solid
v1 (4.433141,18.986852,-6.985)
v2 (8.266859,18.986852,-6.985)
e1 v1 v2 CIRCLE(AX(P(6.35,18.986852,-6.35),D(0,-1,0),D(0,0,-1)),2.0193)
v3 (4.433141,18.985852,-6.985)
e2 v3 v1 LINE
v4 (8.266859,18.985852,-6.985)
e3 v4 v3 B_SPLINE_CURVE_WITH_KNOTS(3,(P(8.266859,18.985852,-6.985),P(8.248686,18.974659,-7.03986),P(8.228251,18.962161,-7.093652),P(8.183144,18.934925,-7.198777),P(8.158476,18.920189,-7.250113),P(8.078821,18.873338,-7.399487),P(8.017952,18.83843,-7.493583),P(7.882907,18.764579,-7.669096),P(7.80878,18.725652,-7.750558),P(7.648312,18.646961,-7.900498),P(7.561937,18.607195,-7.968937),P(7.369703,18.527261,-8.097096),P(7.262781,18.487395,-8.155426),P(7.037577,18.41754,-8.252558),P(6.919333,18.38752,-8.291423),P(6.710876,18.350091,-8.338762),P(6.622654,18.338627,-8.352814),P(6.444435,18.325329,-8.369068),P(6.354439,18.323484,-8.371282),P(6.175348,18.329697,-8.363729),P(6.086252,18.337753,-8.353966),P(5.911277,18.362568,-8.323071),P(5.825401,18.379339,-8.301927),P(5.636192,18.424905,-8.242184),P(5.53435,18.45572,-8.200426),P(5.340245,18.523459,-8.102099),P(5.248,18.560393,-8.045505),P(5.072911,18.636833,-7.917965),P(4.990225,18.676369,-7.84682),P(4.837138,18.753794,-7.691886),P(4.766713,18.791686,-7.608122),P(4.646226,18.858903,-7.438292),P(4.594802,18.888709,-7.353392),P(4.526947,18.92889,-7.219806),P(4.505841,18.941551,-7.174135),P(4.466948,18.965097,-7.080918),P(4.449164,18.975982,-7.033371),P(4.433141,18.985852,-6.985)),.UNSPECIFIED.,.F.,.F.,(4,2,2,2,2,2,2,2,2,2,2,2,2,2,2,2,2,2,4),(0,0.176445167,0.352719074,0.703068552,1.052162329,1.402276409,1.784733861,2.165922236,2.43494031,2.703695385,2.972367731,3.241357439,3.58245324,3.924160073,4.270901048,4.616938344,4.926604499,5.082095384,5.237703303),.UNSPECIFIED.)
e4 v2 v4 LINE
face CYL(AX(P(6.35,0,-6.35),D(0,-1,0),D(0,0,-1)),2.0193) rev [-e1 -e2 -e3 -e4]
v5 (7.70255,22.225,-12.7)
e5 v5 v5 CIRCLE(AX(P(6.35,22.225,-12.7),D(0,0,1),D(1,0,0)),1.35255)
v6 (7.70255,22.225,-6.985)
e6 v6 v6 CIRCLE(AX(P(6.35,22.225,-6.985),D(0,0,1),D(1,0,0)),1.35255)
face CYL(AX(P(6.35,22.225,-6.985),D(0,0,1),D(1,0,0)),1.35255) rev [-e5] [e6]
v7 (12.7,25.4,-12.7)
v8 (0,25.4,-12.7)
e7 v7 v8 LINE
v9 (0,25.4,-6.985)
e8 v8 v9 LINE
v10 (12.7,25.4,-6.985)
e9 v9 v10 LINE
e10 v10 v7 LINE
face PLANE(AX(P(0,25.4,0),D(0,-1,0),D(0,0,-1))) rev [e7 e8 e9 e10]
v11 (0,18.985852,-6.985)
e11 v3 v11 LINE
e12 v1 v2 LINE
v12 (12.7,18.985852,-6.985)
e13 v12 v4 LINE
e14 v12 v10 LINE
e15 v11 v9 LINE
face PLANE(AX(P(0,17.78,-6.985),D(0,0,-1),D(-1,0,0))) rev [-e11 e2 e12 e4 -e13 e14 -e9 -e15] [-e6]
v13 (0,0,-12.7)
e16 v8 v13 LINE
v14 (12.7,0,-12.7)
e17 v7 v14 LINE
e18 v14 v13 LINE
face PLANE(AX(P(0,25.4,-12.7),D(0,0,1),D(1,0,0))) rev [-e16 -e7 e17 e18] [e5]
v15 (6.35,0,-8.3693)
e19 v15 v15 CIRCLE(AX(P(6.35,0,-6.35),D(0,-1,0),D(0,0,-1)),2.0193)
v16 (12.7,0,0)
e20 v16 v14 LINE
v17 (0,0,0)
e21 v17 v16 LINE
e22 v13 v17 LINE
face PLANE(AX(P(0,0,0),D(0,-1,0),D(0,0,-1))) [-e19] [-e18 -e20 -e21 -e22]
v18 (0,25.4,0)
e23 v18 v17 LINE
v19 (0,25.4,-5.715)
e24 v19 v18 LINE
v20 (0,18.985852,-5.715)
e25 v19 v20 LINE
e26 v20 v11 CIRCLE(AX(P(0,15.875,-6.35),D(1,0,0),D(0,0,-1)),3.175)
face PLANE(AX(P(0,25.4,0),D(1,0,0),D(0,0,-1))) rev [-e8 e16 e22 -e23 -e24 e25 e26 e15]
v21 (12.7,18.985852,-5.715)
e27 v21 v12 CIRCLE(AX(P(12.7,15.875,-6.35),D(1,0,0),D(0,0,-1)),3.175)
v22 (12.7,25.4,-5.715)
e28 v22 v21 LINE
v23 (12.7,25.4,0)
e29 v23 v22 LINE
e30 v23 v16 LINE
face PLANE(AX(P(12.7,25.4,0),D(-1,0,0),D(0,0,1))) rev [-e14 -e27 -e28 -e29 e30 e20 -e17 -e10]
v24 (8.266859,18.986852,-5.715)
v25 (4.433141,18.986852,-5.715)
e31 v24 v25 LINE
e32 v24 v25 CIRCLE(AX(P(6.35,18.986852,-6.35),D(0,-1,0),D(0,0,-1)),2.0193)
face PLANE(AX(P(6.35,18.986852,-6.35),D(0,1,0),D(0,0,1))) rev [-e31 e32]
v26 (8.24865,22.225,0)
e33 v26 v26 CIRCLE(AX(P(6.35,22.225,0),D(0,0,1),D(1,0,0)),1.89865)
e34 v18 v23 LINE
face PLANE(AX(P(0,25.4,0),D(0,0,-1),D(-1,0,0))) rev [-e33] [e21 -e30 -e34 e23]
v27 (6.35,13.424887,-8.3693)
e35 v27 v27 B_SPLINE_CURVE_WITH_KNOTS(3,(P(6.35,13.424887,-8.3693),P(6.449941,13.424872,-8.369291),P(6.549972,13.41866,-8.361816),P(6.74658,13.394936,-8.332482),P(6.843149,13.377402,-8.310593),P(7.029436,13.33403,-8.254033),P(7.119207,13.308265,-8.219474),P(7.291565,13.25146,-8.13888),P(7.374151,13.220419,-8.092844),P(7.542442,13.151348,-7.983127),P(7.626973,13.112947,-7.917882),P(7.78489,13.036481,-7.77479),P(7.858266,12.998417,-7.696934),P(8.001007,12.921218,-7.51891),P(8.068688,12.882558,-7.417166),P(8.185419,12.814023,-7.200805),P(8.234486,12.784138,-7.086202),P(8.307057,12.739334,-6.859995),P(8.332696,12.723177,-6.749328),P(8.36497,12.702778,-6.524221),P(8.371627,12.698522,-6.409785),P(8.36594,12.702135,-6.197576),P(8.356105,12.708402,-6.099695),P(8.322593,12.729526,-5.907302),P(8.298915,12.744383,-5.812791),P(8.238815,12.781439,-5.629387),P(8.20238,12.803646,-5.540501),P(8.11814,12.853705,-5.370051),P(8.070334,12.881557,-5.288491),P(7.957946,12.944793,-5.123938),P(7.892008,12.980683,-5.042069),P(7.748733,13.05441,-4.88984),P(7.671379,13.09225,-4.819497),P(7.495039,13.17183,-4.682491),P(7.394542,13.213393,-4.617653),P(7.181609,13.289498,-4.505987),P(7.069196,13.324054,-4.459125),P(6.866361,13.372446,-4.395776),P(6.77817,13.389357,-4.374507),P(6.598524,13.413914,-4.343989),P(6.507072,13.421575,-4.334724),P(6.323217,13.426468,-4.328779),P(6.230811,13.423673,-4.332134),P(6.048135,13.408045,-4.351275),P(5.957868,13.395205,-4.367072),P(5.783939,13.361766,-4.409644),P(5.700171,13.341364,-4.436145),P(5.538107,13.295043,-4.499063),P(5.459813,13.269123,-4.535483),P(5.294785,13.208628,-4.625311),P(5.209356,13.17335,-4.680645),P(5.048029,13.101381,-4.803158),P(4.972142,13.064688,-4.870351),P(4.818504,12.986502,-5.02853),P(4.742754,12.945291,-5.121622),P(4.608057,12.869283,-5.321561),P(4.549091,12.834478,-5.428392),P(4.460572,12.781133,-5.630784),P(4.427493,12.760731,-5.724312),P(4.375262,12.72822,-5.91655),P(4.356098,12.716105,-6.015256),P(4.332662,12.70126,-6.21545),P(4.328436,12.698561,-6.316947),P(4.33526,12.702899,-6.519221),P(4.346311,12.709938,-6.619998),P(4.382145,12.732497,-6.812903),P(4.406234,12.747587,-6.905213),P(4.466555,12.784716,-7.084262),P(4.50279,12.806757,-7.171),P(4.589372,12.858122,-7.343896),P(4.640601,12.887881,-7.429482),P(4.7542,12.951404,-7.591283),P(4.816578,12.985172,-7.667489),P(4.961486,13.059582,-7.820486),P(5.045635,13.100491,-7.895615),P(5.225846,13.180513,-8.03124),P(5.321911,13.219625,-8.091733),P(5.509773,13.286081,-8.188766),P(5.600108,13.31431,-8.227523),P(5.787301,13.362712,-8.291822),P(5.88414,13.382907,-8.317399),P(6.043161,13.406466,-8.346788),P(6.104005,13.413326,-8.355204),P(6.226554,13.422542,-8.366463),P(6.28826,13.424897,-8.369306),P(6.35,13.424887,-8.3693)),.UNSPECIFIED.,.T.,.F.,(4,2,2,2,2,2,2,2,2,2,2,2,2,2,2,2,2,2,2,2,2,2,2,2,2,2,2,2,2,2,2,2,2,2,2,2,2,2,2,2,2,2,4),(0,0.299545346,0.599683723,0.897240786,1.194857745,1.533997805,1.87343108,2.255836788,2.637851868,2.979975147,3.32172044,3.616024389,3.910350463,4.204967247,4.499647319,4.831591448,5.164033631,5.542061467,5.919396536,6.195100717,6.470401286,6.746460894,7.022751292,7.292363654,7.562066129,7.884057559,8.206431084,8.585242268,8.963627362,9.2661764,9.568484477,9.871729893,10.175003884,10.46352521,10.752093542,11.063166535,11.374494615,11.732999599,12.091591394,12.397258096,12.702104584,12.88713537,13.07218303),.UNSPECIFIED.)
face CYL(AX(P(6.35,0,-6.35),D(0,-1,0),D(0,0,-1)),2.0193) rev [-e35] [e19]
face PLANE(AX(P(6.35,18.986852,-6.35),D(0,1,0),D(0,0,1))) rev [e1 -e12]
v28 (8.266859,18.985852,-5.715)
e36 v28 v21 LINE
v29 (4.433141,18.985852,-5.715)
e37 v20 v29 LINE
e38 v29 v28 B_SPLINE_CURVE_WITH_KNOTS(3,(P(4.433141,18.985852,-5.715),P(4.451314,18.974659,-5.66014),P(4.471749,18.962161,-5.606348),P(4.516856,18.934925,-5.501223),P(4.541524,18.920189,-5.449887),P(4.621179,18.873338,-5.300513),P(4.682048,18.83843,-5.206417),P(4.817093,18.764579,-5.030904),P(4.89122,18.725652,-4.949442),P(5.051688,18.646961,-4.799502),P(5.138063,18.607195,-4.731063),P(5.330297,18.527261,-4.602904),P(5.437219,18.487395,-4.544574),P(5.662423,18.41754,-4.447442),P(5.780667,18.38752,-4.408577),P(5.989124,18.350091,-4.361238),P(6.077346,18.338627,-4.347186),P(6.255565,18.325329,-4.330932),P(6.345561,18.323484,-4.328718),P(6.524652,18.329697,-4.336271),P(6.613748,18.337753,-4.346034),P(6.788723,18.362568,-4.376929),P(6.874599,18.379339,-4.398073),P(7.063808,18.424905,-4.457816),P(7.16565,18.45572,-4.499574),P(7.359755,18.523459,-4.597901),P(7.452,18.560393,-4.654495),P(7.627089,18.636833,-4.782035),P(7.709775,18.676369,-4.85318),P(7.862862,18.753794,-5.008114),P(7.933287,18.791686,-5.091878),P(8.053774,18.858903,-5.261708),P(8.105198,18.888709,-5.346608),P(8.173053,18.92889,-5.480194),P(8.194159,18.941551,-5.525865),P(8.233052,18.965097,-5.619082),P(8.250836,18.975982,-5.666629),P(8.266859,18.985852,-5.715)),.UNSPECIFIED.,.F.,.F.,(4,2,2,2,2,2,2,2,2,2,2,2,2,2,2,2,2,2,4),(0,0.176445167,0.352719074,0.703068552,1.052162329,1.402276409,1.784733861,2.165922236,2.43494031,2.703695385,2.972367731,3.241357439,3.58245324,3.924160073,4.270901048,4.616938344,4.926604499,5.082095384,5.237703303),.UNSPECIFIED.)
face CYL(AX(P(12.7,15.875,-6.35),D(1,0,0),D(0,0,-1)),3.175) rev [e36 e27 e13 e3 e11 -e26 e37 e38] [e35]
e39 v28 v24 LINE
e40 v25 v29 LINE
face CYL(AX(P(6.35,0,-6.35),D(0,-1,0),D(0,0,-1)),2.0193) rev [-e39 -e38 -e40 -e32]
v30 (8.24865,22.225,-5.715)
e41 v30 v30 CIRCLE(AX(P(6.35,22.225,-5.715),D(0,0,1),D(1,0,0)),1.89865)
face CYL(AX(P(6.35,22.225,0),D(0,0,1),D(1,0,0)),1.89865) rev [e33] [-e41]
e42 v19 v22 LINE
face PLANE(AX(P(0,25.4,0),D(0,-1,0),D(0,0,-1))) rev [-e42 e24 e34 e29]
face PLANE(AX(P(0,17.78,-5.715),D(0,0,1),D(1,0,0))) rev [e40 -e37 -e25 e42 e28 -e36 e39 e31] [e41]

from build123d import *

# Parameters (mm, degrees)
SKETCH1_W                      = 12.7
SKETCH1_H                      = 12.7
BOSS_EXTRUDE1_DEPTH            = 25.4
F_1_4_0_25_DIAMETER_HOLE1_D    = 6.35
SKETCH4_W                      = 1.27
SKETCH4_H                      = 7.62
CUT_EXTRUDE1_DEPTH             = 32.108519733
TAP_DRILL_FOR_10_32_TAP1_DEPTH = 18.986851973
F_6_CLEARANCE_HOLE1_D          = 3.7973
F_6_CLEARANCE_HOLE1_DEPTH      = 5.715
TAP_DRILL_FOR_6_32_TAP1_D      = 2.7051


# Read off the part's stored shape, not the designer's step: Tap Drill for #10-32 Tap1
with BuildPart() as part:
    # Sketch1 → Boss-Extrude1 (new body)
    with BuildSketch(Plane(origin=(0, 0, 0), x_dir=(1, 0, 0), z_dir=(0, 1, 0))):
        with Locations((6.35, 6.35)):
            Rectangle(SKETCH1_W, SKETCH1_H)
    extrude(amount=BOSS_EXTRUDE1_DEPTH)

    # 1/4 (0.25) Diameter Hole1 (through all)
    with Locations(Plane(origin=(12.7, 0, 0), x_dir=(0, 0, -1), z_dir=(1, 0, 0))):
        with Locations((6.35, 15.875)):
            Hole(F_1_4_0_25_DIAMETER_HOLE1_D / 2)

    # Sketch4 → Cut-Extrude1 (cut, through all)
    with BuildSketch(Plane(origin=(12.7, 0, 0), x_dir=(0, 0, -1), z_dir=(1, 0, 0))):
        with Locations((6.35, 21.59)):
            Rectangle(SKETCH4_W, SKETCH4_H)
    extrude(amount=-CUT_EXTRUDE1_DEPTH, mode=Mode.SUBTRACT)

    # Tap Drill for #10-32 Tap1 outline → Tap Drill for #10-32 Tap1 (cut)
    with BuildSketch(Plane(origin=(0, 0, 0), x_dir=(1, 0, 0), z_dir=(0, 1, 0))):
        with BuildLine():
            ThreePointArc((8.266858756, 5.715), (8.3693, 6.35), (8.266858756, 6.985))
            ThreePointArc((8.266858756, 6.985), (6.35, 8.3693), (4.433141244, 6.985))
            ThreePointArc((4.433141244, 6.985), (4.3307, 6.35), (4.433141244, 5.715))
            ThreePointArc((4.433141244, 5.715), (6.35, 4.3307), (8.266858756, 5.715))
        make_face()
    extrude(amount=TAP_DRILL_FOR_10_32_TAP1_DEPTH, mode=Mode.SUBTRACT)

    # #6 Clearance Hole1
    with Locations(Plane.XY):
        with Locations((6.35, 22.225)):
            Hole(F_6_CLEARANCE_HOLE1_D / 2, depth=F_6_CLEARANCE_HOLE1_DEPTH)

    # Tap Drill for #6-32 Tap1 (through all)
    with Locations(Plane.XY.offset(-6.985)):
        with Locations((6.35, 22.225)):
            Hole(TAP_DRILL_FOR_6_32_TAP1_D / 2)


solid = part.part
